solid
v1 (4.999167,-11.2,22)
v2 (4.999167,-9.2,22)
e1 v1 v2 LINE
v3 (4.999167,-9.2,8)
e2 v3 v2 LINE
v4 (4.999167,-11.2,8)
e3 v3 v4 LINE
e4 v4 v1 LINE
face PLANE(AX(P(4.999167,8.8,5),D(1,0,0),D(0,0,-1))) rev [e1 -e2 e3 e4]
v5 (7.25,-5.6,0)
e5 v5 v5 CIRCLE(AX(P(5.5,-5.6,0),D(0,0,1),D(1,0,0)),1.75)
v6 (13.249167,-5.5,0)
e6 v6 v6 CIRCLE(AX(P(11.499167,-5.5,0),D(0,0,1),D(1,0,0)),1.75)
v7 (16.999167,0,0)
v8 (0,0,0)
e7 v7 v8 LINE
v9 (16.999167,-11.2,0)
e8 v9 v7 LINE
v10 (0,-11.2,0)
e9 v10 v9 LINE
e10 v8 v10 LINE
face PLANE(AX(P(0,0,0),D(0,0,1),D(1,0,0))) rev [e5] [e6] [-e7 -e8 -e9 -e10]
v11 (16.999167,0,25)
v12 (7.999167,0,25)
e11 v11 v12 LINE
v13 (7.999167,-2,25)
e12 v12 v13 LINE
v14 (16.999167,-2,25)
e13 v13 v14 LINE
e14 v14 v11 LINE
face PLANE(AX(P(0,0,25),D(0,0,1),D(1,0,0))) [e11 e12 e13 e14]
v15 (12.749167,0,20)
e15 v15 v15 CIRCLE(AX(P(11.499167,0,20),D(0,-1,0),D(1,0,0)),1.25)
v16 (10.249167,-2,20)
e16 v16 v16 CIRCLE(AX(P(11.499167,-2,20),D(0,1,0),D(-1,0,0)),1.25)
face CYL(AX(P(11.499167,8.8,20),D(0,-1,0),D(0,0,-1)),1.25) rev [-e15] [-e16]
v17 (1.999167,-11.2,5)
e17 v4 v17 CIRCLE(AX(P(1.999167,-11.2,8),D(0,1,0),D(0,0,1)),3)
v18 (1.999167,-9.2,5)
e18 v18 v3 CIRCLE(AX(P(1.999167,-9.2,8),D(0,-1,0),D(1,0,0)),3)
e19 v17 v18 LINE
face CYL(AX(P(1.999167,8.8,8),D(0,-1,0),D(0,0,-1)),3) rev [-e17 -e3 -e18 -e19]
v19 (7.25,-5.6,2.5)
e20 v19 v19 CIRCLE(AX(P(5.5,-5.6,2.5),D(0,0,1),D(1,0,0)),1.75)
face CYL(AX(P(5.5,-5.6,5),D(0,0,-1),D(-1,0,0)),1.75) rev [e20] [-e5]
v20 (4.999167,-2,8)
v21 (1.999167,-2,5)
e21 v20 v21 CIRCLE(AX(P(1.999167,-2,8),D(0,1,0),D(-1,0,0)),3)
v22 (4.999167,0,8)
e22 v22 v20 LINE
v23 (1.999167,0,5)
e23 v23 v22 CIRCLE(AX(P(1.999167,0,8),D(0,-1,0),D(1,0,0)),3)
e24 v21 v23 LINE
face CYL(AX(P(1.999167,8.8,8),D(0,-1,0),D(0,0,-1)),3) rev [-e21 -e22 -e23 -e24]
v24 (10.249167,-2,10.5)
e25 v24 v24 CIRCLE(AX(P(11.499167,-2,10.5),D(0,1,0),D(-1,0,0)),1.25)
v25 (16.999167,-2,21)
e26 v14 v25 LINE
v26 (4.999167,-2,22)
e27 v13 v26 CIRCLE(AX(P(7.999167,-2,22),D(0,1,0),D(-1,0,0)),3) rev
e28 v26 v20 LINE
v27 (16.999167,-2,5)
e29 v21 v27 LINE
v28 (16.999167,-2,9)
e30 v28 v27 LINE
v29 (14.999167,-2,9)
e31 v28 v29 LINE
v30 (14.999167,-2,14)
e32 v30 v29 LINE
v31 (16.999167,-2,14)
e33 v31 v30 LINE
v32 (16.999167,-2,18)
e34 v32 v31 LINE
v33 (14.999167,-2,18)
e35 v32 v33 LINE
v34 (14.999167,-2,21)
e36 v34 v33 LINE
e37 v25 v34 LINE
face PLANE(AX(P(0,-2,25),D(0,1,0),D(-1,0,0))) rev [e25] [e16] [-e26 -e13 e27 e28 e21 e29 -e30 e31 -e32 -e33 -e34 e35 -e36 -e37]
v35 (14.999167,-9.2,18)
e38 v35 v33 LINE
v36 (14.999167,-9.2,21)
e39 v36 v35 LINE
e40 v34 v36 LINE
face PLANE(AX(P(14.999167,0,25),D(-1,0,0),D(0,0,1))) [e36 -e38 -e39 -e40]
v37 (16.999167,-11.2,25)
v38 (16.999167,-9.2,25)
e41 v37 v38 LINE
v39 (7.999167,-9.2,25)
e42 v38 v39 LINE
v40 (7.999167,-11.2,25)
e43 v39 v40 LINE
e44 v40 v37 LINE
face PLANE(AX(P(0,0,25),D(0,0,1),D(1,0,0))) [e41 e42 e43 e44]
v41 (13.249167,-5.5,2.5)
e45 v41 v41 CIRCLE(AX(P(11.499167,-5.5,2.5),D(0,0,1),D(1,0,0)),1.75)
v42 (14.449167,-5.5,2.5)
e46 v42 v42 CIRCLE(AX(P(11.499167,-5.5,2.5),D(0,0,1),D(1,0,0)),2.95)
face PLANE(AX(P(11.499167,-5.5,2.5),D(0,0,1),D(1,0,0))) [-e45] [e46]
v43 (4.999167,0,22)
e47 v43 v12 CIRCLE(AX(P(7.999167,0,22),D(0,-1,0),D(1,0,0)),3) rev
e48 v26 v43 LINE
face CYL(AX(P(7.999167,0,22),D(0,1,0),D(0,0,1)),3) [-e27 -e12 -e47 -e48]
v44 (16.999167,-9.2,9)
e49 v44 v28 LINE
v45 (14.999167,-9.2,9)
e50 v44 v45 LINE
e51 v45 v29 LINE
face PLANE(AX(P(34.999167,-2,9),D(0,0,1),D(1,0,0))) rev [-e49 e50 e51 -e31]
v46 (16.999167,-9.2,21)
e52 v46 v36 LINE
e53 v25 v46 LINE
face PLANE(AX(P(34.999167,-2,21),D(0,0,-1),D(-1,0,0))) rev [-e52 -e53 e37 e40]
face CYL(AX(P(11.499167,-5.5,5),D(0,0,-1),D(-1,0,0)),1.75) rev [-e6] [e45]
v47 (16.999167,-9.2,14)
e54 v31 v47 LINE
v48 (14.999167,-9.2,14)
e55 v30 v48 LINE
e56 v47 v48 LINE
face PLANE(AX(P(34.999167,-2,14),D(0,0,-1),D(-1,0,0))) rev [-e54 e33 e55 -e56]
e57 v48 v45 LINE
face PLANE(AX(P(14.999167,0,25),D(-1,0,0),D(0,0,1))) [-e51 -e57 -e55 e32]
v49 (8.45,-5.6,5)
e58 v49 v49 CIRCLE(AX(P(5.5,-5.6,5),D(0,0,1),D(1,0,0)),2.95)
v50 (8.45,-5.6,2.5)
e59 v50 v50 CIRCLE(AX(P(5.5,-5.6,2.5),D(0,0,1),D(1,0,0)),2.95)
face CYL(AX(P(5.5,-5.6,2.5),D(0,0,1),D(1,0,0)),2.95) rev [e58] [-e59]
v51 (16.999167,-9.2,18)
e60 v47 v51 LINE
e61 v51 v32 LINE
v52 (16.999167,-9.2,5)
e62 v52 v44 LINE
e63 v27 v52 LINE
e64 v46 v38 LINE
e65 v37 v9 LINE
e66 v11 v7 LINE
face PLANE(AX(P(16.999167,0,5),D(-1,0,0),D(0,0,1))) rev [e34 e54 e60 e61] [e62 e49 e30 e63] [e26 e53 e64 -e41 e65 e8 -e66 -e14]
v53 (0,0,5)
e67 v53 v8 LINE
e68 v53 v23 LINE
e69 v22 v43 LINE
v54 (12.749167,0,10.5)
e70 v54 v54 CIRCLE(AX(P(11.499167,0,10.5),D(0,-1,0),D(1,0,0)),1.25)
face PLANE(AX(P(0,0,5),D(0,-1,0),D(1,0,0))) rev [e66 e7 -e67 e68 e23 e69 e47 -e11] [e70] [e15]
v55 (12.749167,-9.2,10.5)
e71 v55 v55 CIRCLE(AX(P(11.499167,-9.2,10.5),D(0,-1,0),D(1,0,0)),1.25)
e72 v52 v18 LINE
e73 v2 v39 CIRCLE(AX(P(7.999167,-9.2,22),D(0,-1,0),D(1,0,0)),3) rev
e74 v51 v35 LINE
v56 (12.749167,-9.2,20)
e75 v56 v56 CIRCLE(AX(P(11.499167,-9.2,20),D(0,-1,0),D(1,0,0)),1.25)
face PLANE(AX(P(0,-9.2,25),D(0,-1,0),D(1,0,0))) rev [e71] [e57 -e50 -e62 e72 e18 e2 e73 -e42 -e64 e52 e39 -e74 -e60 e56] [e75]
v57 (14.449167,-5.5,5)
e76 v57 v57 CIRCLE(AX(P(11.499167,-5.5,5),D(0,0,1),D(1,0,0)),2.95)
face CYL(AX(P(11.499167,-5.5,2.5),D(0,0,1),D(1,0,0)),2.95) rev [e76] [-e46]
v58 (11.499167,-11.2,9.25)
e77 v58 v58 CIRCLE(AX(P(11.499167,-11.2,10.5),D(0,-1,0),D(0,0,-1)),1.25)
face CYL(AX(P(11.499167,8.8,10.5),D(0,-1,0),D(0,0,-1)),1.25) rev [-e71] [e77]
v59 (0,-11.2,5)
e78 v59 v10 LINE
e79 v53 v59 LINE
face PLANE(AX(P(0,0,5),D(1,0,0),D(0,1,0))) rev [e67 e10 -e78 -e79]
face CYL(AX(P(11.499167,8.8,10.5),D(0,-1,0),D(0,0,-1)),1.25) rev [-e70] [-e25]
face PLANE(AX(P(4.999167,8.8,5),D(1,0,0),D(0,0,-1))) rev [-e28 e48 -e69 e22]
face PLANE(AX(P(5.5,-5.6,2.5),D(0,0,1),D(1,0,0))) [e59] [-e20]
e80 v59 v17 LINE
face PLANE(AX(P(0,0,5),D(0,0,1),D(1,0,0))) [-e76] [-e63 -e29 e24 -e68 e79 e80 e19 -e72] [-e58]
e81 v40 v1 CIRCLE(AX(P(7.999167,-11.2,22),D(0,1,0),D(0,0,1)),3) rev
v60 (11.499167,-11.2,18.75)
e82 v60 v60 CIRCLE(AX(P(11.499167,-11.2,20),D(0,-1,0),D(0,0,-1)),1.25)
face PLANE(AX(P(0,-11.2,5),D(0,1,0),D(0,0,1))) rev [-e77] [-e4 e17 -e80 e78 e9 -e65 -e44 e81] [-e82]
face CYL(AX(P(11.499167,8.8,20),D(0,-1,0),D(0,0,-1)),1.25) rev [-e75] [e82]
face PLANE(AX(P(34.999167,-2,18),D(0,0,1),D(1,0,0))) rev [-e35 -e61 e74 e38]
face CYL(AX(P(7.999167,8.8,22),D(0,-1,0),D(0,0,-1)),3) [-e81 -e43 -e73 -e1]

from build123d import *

# Parameters (mm, degrees)
ESQUISSE1_W             = 16.999166609
ESQUISSE1_H             = 11.2
ESQUISSE1_R             = 1.75
BOSS_EXTRU_1_DEPTH      = 5
ESQUISSE2_W             = 2
ESQUISSE2_H             = 7.2
BOSS_EXTRU_2_DEPTH      = 20
ESQUISSE3_W             = 4
ESQUISSE3_H             = 7.2
ENL_V_MAT_EXTRU_1_DEPTH = 20
ESQUISSE4_R             = 1.25
ESQUISSE4_W             = 4.999166609
ESQUISSE4_H             = 20
ENL_V_MAT_EXTRU_2_DEPTH = 20
ESQUISSE5_R             = 2.95
ENL_V_MAT_EXTRU_3_DEPTH = 2.5
CONG_1_START            = -11.2
CONG_1_DEPTH            = 12.2
CONG_1_2_DEPTH          = 2
CONG_1_START_2          = -2
CONG_1_3_DEPTH          = 2


with BuildPart() as part:
    # Esquisse1 → Boss.-Extru.1 (new body)
    with BuildSketch(Plane.XY):
        with Locations((8.499583304, -5.6)):
            Rectangle(ESQUISSE1_W, ESQUISSE1_H)
        with Locations((5.5, -5.6)):
            Circle(ESQUISSE1_R, mode=Mode.SUBTRACT)
        with Locations((11.499166609, -5.5)):
            Circle(ESQUISSE1_R, mode=Mode.SUBTRACT)
    extrude(amount=BOSS_EXTRU_1_DEPTH)

    # Esquisse2 → Boss.-Extru.2 (add)
    with BuildSketch(Plane.XY.offset(5)):
        Polygon((14.999166609, -9.2), (0, -9.2), (0, -11.2), (16.999166609, -11.2), (16.999166609, -9.2), align=None)
        with Locations((15.999166609, -5.6)):
            Rectangle(ESQUISSE2_W, ESQUISSE2_H)
        Polygon((16.999166609, 0), (0, 0), (0, -2), (14.999166609, -2), (16.999166609, -2), align=None)
    extrude(amount=BOSS_EXTRU_2_DEPTH)

    # Esquisse3 → Enlèv. mat.-Extru.1 (cut)
    with BuildSketch(Plane.ZY.offset(-14.999166609)):
        with Locations((7, -5.6)):
            Rectangle(ESQUISSE3_W, ESQUISSE3_H)
        with Locations((23, -5.6)):
            Rectangle(ESQUISSE3_W, ESQUISSE3_H)
        with Locations((16, -5.6)):
            Rectangle(ESQUISSE3_W, ESQUISSE3_H)
    extrude(amount=-ENL_V_MAT_EXTRU_1_DEPTH, mode=Mode.SUBTRACT)

    # Esquisse4 → Enlèv. mat.-Extru.2 (cut)
    with BuildSketch(Plane(origin=(0, -11.2, 0), x_dir=(-1, 0, 0), z_dir=(0, -1, 0))):
        with Locations(Location((-11.499166609, -20, 0), (0, 0, 90))):
            Circle(ESQUISSE4_R)
        with Locations(Location((-11.499166609, -10.5, 0), (0, 0, 90))):
            Circle(ESQUISSE4_R)
        with Locations((-2.499583305, -15)):
            Rectangle(ESQUISSE4_W, ESQUISSE4_H)
    extrude(amount=-ENL_V_MAT_EXTRU_2_DEPTH, mode=Mode.SUBTRACT)

    # Esquisse5 → Enlèv. mat.-Extru.3 (cut)
    with BuildSketch(Plane.XY.offset(5)):
        with Locations((5.5, -5.6)):
            Circle(ESQUISSE5_R)
        with Locations((11.499166609, -5.5)):
            Circle(ESQUISSE5_R)
    extrude(amount=-ENL_V_MAT_EXTRU_3_DEPTH, mode=Mode.SUBTRACT)

    # Congé1: read off the stored shape, not the designer's step
    # Congé1 outline → Congé1 (cut)
    with BuildSketch(Plane(origin=(0, 0, 0), x_dir=(1, 0, 0), z_dir=(0, 1, 0)).offset(CONG_1_START)):
        with BuildLine():
            ThreePointArc((7.999166609, -25), (5.877846265, -24.121320344), (4.999166609, -22))
            Line((4.999166609, -22), (4.999166609, -25))
            Line((4.999166609, -25), (7.999166609, -25))
        make_face()
    extrude(amount=CONG_1_DEPTH, mode=Mode.SUBTRACT)

    # Cong_1 2 outline → Cong_1 2 (add)
    with BuildSketch(Plane(origin=(0, 0, 0), x_dir=(1, 0, 0), z_dir=(0, 1, 0)).offset(CONG_1_START)):
        with BuildLine():
            ThreePointArc((1.999166609, -5), (4.120486952, -5.878679656), (4.999166609, -8))
            Line((4.999166609, -8), (4.999166609, -5))
            Line((4.999166609, -5), (1.999166609, -5))
        make_face()
    extrude(amount=CONG_1_2_DEPTH)

    # Cong_1 3 outline → Cong_1 3 (add)
    with BuildSketch(Plane(origin=(0, 0, 0), x_dir=(1, 0, 0), z_dir=(0, 1, 0)).offset(CONG_1_START_2)):
        with BuildLine():
            ThreePointArc((1.999166609, -5), (4.120486952, -5.878679656), (4.999166609, -8))
            Line((4.999166609, -8), (4.999166609, -5))
            Line((4.999166609, -5), (1.999166609, -5))
        make_face()
    extrude(amount=CONG_1_3_DEPTH)


solid = part.part
